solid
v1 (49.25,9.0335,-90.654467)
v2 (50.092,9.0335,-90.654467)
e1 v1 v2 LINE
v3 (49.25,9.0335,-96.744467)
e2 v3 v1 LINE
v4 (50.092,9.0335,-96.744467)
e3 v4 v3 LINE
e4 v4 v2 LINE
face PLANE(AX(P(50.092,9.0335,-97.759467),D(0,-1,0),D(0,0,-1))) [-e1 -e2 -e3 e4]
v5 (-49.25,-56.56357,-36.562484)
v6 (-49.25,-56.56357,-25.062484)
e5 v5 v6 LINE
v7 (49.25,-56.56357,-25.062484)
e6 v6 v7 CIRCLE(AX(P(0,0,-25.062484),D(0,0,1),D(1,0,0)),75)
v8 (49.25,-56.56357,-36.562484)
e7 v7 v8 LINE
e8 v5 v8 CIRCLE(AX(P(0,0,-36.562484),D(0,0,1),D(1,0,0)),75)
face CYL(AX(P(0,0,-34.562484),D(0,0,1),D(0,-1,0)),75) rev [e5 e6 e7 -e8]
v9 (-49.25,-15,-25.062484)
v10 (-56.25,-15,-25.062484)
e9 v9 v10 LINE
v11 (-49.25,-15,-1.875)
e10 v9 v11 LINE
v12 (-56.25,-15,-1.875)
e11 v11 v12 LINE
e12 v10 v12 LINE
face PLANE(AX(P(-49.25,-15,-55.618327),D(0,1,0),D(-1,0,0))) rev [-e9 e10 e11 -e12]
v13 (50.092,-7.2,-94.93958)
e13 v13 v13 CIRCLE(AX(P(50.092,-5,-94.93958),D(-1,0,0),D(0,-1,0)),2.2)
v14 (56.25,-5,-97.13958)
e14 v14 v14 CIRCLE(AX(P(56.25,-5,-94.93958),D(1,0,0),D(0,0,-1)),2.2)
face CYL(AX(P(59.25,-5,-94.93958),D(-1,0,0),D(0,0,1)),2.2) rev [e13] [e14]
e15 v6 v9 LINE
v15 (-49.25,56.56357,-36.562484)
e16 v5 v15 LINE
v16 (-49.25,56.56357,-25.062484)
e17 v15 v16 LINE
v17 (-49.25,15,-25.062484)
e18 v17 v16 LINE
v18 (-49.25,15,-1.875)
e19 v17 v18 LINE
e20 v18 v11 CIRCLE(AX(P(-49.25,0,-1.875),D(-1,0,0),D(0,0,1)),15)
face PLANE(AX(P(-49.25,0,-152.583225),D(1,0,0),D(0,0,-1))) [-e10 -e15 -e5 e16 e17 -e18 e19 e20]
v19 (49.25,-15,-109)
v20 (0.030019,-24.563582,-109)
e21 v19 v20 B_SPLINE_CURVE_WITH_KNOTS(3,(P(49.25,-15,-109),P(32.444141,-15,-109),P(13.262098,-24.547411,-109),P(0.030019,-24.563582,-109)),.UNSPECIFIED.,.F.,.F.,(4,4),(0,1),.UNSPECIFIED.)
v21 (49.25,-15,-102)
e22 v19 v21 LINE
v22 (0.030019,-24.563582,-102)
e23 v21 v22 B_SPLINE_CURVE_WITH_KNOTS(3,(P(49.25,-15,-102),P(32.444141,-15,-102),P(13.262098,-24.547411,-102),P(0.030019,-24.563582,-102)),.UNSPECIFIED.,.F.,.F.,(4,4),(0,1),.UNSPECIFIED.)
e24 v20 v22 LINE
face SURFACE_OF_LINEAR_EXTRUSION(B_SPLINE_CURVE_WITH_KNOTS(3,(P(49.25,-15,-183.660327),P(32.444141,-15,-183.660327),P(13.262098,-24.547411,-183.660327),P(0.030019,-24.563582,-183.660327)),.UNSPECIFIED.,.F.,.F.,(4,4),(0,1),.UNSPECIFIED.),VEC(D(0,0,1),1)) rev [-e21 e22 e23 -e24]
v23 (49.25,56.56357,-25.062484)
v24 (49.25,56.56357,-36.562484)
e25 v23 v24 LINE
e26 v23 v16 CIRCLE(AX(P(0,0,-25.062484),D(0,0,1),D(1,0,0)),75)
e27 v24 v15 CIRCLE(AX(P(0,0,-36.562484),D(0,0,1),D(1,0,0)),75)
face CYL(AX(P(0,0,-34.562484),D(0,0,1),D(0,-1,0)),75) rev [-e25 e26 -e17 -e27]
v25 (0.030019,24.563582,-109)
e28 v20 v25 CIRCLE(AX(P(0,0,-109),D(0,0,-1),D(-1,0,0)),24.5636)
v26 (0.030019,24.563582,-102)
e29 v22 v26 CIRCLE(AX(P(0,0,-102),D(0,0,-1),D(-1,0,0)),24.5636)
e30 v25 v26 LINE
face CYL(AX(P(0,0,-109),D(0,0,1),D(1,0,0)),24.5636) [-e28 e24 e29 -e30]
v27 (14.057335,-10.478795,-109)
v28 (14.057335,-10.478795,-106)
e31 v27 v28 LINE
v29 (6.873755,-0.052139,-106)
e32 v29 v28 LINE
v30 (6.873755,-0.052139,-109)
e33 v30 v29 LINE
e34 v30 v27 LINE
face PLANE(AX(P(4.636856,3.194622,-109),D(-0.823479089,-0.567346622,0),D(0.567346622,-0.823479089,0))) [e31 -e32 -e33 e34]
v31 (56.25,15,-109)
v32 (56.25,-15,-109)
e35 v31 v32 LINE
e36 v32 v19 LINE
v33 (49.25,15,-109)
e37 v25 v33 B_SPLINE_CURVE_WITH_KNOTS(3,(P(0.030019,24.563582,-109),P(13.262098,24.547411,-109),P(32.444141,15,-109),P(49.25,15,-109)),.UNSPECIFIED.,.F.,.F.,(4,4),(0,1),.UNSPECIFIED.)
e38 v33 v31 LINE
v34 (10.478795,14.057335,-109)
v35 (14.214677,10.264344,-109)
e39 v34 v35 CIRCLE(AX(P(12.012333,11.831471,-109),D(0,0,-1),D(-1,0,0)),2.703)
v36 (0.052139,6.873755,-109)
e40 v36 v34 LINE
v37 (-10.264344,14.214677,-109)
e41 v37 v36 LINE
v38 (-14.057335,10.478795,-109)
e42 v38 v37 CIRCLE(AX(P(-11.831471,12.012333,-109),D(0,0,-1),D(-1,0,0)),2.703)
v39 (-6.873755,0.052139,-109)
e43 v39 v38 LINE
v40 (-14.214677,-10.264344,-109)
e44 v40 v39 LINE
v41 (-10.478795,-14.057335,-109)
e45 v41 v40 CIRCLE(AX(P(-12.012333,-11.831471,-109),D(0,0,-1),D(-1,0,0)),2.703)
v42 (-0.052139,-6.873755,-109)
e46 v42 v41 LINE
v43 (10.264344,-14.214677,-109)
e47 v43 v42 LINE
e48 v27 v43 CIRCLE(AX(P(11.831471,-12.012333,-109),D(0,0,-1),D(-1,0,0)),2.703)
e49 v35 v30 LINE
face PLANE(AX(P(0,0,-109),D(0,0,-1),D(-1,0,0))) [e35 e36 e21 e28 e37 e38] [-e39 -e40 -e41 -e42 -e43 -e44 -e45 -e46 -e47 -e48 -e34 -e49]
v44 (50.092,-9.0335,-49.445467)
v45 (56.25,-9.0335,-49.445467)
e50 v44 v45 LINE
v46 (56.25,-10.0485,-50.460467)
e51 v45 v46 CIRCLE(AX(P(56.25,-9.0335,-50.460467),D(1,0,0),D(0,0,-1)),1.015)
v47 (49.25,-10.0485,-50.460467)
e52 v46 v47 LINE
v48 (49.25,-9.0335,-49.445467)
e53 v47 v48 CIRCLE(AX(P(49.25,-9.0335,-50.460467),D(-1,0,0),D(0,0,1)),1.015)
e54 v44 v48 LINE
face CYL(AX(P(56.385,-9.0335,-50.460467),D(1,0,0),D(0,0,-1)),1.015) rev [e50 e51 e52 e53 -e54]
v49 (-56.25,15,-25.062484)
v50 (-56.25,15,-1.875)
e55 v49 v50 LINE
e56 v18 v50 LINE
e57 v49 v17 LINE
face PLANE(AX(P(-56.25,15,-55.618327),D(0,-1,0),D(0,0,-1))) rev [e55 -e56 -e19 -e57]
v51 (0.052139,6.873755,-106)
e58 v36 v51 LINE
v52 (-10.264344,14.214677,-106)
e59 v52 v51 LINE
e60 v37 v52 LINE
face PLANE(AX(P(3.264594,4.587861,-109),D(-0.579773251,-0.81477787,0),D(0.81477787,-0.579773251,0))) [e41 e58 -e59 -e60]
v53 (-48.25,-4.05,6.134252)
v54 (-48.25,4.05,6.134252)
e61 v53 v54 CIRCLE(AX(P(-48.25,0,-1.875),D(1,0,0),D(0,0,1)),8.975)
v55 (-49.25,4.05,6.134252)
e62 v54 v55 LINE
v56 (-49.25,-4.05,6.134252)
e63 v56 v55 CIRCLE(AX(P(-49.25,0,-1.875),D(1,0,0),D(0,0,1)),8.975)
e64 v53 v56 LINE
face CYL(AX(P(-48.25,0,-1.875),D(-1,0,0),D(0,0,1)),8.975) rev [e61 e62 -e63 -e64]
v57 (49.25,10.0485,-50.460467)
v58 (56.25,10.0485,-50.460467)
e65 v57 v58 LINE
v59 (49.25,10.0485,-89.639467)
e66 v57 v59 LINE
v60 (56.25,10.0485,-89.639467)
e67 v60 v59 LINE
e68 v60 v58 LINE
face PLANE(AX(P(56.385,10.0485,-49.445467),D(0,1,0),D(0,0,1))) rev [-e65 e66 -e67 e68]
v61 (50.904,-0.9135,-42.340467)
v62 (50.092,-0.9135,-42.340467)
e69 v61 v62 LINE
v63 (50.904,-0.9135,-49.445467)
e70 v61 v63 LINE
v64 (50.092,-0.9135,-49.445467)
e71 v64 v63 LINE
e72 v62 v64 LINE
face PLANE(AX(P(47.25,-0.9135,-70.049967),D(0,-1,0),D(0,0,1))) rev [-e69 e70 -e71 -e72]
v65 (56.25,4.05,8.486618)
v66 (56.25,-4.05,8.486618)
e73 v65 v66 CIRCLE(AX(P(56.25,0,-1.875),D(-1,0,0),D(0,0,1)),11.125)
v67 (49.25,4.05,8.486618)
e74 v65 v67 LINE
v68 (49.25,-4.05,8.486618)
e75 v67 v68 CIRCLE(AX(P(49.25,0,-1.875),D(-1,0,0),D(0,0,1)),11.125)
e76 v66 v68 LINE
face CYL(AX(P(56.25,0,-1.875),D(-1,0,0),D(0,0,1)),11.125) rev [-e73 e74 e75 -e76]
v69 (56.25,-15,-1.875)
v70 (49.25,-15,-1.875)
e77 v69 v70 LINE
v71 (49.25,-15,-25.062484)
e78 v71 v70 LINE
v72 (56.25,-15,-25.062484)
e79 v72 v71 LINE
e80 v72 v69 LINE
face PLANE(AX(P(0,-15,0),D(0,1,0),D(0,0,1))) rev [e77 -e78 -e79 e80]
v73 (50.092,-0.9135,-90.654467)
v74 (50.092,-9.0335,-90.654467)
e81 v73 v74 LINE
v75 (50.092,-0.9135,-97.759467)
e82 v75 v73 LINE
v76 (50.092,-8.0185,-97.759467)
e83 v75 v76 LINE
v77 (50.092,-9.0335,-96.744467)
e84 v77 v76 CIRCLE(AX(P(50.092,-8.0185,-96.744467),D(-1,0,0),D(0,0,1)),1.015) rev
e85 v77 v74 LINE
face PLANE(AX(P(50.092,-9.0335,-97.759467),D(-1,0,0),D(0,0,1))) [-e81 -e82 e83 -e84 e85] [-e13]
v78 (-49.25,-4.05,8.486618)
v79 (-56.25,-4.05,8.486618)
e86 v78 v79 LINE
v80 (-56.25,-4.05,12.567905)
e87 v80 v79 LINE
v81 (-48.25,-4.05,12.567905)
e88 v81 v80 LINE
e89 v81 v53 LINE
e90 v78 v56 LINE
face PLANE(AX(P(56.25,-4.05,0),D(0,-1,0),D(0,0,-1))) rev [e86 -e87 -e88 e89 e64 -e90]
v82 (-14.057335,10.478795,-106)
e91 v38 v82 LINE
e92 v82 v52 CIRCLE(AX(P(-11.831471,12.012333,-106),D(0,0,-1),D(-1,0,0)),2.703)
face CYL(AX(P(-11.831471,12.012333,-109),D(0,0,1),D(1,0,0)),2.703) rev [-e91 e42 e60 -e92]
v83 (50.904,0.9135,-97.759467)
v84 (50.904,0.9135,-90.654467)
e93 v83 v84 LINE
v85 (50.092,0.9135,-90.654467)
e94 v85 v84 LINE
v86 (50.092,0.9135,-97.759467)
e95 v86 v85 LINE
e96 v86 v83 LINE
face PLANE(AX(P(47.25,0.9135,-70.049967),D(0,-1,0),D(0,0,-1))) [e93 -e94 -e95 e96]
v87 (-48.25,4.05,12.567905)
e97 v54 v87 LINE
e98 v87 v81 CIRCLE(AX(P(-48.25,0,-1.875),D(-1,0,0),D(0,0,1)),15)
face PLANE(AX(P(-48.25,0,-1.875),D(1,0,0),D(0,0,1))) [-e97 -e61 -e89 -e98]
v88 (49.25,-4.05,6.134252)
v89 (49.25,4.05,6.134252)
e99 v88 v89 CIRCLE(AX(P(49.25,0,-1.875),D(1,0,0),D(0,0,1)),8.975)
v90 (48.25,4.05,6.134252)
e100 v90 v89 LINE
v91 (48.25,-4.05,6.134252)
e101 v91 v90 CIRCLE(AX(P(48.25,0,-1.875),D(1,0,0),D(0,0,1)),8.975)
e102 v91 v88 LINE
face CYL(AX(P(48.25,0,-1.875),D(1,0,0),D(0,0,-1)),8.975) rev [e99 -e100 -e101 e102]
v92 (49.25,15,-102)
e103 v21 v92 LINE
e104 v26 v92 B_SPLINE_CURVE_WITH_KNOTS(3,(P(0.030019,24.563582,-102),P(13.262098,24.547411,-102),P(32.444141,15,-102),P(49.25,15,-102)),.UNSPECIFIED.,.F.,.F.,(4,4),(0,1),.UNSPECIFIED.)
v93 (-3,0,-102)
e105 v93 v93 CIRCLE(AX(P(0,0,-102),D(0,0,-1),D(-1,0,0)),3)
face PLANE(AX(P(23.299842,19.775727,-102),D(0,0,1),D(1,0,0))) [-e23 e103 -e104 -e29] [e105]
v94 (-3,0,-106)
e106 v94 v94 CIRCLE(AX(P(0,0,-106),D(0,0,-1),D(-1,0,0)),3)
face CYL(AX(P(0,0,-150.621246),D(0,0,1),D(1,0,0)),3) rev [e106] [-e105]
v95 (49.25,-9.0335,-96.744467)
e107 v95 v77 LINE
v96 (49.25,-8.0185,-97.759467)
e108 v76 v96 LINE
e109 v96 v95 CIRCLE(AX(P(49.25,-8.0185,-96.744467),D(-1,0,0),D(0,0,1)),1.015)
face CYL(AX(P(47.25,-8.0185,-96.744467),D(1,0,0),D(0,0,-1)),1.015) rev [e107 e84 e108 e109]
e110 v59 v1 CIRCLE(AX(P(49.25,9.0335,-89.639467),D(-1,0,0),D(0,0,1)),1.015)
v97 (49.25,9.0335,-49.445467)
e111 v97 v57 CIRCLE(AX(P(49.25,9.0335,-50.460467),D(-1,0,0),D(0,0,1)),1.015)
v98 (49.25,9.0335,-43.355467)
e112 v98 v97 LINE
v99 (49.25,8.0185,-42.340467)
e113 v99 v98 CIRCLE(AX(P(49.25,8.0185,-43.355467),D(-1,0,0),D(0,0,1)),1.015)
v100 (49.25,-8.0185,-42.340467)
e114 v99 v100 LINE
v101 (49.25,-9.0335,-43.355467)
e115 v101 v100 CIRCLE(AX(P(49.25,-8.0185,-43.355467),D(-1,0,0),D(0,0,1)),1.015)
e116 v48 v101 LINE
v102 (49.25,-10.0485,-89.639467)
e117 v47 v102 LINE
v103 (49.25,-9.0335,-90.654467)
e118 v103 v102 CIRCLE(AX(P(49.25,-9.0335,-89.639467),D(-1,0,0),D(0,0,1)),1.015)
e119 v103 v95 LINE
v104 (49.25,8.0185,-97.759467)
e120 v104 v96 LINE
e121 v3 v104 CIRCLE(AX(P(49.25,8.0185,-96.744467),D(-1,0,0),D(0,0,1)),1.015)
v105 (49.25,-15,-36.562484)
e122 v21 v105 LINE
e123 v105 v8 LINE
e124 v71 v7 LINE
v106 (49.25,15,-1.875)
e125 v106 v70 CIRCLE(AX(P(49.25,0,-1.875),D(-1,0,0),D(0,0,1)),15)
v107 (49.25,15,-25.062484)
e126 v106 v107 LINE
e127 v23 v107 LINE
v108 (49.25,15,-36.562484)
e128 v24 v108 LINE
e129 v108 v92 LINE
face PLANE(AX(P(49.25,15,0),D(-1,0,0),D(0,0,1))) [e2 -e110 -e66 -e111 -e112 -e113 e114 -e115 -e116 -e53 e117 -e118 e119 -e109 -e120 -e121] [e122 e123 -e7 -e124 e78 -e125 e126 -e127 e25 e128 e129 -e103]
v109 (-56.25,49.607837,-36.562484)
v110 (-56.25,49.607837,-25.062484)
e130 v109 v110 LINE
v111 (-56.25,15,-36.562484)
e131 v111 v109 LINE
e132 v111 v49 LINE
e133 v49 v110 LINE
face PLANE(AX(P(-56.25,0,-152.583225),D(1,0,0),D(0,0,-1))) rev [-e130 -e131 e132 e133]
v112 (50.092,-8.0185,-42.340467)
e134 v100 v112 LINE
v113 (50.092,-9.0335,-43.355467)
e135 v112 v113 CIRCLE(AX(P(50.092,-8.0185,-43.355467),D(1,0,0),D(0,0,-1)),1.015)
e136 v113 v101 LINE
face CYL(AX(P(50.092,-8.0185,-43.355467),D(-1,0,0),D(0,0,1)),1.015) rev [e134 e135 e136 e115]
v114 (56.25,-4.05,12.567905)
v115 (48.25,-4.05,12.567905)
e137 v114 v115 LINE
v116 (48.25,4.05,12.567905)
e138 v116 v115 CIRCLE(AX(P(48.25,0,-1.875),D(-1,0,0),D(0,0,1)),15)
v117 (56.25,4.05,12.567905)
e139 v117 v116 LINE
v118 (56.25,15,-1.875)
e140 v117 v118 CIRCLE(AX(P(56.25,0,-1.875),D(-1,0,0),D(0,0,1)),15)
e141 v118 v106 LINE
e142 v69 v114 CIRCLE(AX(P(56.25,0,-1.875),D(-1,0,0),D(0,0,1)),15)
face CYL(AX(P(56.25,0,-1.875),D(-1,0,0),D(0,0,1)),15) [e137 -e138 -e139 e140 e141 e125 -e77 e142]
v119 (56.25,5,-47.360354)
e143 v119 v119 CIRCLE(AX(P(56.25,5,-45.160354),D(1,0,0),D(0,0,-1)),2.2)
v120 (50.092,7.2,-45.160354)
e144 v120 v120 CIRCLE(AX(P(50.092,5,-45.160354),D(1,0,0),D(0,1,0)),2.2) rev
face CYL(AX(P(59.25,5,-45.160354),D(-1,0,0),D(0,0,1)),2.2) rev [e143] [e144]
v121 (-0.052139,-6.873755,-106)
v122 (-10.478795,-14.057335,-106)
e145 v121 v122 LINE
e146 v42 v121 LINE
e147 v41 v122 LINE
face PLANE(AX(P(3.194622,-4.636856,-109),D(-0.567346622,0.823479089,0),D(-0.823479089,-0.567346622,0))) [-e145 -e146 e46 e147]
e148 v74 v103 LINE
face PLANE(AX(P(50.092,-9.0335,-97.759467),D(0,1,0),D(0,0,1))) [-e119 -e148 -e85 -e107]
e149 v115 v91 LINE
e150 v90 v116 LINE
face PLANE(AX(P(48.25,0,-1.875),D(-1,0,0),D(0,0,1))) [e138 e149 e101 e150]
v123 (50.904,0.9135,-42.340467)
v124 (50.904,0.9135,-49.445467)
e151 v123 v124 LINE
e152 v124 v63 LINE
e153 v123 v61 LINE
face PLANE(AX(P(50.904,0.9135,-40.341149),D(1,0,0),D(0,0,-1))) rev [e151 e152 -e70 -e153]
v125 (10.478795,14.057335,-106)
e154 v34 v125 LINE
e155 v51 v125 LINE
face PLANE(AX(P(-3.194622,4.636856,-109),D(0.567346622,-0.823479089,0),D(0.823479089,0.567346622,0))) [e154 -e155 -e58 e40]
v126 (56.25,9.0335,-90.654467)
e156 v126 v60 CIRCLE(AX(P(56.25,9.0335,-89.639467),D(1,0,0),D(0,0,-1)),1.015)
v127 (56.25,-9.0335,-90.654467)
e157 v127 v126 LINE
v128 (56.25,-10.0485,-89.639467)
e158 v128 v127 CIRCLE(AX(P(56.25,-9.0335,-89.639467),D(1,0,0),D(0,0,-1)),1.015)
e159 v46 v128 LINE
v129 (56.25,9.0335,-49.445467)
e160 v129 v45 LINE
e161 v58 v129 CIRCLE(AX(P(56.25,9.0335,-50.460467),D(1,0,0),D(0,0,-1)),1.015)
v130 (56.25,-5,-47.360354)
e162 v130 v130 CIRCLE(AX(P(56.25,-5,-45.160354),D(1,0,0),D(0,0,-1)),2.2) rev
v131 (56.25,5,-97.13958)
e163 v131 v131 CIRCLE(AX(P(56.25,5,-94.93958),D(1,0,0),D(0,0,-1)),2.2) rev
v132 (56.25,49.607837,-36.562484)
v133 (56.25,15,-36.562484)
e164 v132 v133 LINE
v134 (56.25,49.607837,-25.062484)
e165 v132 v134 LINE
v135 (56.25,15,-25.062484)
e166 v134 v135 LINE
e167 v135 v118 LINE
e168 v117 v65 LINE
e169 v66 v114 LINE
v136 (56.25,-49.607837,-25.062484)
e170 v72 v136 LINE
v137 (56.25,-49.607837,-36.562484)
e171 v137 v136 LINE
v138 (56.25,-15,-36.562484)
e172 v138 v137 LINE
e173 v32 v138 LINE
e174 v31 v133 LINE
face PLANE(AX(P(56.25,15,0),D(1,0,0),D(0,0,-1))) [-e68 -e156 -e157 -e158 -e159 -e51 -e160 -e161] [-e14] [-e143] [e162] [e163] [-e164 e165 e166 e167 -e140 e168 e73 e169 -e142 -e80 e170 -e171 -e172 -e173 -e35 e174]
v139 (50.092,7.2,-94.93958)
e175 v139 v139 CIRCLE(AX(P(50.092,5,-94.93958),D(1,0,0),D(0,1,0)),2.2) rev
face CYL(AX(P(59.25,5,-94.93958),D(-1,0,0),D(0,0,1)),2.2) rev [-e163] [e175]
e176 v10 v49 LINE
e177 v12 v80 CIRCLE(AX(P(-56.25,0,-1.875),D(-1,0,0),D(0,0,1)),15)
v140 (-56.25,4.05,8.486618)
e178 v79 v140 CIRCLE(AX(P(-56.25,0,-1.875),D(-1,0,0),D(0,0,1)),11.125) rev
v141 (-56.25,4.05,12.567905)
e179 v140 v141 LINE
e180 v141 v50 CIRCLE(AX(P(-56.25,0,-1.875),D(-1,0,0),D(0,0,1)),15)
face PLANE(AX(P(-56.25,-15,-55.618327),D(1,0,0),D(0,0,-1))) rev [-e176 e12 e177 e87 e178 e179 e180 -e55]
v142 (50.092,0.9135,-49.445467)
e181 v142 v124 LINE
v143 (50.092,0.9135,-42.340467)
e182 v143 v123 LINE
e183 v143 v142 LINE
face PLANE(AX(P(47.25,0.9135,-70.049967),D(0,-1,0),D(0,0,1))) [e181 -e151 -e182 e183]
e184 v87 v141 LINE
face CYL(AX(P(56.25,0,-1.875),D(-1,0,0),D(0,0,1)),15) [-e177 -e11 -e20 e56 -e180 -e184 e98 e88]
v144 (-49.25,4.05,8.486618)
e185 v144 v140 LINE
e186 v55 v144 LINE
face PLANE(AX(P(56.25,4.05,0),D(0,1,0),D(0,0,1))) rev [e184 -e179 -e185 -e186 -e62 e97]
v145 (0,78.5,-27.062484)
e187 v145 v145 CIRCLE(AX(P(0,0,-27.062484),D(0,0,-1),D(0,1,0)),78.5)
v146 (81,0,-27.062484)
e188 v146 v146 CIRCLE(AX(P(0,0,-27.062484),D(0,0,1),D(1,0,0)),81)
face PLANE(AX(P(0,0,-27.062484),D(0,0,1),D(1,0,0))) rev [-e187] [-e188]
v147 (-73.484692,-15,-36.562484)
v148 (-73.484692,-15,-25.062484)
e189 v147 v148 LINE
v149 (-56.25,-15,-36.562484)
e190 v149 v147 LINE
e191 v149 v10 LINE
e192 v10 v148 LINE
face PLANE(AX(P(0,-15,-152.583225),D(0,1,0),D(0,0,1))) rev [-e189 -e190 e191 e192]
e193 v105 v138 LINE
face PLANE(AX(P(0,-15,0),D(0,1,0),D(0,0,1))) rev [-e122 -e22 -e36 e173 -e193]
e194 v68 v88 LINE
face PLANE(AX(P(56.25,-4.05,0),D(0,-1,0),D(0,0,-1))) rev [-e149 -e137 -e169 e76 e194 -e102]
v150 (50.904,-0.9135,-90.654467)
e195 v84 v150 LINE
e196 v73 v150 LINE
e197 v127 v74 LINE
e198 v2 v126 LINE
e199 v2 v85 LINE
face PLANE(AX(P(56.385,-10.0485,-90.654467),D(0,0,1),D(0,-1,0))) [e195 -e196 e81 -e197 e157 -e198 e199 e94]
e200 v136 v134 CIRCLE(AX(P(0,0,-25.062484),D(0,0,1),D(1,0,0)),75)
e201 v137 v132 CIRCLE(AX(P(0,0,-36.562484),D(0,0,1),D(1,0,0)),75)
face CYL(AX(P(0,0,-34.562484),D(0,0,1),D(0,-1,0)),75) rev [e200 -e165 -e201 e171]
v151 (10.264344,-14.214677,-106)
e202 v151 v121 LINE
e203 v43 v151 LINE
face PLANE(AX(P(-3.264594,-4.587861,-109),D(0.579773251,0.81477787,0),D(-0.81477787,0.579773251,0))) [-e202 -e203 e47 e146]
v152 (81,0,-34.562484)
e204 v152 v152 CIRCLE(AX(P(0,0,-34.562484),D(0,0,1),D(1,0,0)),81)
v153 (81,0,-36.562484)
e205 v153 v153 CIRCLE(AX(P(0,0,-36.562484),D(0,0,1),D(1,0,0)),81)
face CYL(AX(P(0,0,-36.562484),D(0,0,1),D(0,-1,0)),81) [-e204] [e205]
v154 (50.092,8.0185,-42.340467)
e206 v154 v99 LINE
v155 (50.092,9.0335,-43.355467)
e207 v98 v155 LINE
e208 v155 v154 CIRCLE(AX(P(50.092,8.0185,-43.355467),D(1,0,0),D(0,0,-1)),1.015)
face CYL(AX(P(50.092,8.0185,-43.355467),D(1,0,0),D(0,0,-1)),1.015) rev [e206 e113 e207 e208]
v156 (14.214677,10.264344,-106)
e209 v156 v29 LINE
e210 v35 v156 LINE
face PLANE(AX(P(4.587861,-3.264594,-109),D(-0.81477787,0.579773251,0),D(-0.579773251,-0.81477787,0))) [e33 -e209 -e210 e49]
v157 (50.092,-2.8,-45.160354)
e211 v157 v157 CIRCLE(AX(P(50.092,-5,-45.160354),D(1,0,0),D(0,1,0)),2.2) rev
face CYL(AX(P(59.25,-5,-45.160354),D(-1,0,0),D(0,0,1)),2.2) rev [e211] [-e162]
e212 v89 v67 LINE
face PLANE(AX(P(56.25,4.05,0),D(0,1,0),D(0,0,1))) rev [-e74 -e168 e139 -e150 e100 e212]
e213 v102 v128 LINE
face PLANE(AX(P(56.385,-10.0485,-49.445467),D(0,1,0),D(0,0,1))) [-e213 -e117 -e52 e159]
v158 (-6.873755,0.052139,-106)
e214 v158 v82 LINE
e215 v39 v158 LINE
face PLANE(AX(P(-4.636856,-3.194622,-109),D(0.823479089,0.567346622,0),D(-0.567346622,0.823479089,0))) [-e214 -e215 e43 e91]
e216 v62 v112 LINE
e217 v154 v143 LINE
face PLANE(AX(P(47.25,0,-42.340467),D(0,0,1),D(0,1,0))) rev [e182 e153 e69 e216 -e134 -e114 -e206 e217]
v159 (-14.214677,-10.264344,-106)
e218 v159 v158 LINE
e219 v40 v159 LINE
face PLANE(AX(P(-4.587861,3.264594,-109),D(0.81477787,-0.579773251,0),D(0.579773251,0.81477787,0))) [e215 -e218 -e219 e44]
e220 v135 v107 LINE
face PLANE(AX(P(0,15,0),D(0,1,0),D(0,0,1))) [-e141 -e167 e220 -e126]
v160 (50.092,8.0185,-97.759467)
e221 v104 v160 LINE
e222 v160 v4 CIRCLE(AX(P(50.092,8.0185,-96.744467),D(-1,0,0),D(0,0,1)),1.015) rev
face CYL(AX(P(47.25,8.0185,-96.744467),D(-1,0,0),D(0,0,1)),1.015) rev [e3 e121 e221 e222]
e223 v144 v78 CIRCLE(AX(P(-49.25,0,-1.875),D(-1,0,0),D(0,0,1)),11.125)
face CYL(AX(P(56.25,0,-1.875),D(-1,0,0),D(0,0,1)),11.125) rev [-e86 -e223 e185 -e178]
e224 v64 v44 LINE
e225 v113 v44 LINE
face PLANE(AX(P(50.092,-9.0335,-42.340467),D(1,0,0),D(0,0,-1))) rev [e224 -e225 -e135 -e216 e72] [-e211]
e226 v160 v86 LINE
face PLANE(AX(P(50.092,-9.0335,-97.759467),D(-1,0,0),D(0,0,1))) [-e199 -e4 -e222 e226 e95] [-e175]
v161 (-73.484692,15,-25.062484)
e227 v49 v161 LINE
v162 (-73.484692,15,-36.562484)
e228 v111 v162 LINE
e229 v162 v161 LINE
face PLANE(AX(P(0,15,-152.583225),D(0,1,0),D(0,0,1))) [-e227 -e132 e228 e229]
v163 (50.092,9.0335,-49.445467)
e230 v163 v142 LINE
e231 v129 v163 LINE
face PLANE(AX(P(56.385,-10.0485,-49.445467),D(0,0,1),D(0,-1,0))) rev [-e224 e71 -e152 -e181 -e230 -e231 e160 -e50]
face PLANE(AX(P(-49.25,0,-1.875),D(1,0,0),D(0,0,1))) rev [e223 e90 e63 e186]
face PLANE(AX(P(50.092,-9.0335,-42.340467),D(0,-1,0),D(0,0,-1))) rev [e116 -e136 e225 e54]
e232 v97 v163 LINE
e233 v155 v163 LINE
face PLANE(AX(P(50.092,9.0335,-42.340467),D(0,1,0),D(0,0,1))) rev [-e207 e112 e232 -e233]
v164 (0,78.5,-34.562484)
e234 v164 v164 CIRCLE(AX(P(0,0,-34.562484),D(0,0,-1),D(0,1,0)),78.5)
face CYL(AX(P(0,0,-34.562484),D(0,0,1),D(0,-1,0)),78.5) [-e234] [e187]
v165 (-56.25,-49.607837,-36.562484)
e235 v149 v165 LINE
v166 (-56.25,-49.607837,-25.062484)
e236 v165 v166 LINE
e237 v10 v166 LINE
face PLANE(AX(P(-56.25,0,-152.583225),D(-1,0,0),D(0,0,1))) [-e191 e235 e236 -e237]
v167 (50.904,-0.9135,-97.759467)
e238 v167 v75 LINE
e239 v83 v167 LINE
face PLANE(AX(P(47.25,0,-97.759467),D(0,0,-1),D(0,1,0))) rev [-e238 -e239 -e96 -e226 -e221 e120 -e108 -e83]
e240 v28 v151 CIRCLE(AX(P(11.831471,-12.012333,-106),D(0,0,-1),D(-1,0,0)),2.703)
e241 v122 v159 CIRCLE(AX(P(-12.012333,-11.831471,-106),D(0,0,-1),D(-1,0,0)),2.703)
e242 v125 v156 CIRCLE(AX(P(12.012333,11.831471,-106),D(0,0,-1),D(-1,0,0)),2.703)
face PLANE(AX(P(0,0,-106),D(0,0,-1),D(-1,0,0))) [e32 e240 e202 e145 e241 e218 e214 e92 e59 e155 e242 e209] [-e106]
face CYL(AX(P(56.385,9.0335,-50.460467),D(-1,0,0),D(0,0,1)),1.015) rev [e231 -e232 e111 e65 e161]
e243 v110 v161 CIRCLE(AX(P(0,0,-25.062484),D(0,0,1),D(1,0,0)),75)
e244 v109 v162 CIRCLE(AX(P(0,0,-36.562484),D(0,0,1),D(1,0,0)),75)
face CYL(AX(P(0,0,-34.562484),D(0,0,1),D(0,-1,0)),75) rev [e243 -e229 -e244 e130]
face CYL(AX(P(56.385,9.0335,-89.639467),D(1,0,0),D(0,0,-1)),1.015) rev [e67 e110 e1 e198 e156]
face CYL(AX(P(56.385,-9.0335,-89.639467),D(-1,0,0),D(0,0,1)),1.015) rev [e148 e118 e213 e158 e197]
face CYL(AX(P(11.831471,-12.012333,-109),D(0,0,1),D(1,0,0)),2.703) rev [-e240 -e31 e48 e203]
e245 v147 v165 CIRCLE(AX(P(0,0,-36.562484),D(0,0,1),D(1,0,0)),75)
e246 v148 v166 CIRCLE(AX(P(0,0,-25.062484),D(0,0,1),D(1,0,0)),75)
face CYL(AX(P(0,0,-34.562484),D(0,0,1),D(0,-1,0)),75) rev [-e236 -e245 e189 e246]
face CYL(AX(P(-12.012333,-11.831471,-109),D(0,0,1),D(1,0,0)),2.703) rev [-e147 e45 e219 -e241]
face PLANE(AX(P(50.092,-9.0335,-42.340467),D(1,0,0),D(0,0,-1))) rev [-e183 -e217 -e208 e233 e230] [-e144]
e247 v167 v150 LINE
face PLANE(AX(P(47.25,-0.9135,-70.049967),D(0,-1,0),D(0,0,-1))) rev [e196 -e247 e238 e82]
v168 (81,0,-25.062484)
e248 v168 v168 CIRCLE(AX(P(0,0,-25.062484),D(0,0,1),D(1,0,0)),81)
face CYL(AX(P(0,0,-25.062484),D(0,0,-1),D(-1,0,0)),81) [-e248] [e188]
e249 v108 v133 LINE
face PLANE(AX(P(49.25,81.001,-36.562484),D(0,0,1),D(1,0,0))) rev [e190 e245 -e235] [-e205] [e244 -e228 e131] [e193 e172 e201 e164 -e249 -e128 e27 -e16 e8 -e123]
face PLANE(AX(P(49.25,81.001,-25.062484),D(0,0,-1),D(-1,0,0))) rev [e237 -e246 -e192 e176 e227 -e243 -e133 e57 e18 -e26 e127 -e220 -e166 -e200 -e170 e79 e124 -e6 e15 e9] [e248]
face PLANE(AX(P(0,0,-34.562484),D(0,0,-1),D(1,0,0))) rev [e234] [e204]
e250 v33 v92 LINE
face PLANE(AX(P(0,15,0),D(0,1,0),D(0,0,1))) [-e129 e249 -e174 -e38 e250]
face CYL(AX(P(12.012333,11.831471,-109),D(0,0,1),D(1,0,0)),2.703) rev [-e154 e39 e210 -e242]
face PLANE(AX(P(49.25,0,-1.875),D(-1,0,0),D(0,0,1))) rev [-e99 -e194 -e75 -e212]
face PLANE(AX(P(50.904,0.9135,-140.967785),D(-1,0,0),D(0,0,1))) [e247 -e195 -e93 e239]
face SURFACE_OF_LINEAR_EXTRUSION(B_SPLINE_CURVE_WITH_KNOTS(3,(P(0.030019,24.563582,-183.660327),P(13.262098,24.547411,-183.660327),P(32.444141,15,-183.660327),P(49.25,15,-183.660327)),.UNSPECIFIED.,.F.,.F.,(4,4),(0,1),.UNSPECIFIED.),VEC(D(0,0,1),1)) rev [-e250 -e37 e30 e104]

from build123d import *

# Parameters (mm, degrees)
SKETCH1_W                             = 7
SKETCH1_H                             = 2
SKETCH1_H_2                           = 22.25
BOSS_EXTRUDE1_DEPTH                   = 15
CUT_EXTRUDE1_DEPTH                    = 129.379320765
CUT_EXTRUDE1_DEPTH_BACK               = 129.379320765
SKETCH3_R                             = 11.125
CUT_EXTRUDE2_DEPTH                    = 7
SKETCH6_W                             = 34
SKETCH6_H                             = 20.3
CUT_EXTRUDE3_DEPTH                    = 7
SKETCH7_R                             = 2.2
CUT_EXTRUDE4_DEPTH                    = 10
CAVITY3_START                         = 49.25
CAVITY3_DEPTH                         = 0.842
CAVITY3_2_DEPTH                       = 6.6275
CAVITY3_START_2                       = 55.8775
CAVITY3_3_DEPTH                       = 0.3725
CAVITY3_START_3                       = -0.9135
CAVITY3_4_DEPTH                       = 1.827
CUT_EXTRUDE5_DEPTH                    = 10
CUT_EXTRUDE6_DEPTH                    = 0.842
CUT_EXTRUDE7_START                    = -7.105
SKETCH10_W                            = 0.812
SKETCH10_H                            = 1.827
CUT_EXTRUDE7_DEPTH                    = 7.105
SKETCH11_W                            = 7
SKETCH11_H                            = 30
BOSS_EXTRUDE2_DEPTH                   = 42
CAVITY4_START                         = 49.25
CAVITY4_DEPTH                         = 7
CAVITY4_2_DEPTH                       = 6.6275
CAVITY4_3_DEPTH                       = 0.842
CAVITY4_START_2                       = -0.9135
CAVITY4_4_DEPTH                       = 1.827
CUT_EXTRUDE8_DEPTH                    = 42
MIRROR3_COPY_1_SKETCH_R               = 2.2
MIRROR3_COPY_1_DEPTH                  = 10
MIRROR3_COPY_2_SKETCH_R               = 2.2
MIRROR3_COPY_2_DEPTH                  = 10
MIRROR3_COPY_3_DEPTH                  = 0.842
CUT_EXTRUDE9_DEPTH                    = 42
BOSS_EXTRUDE3_DEPTH                   = 30
BOSS_EXTRUDE6_DEPTH                   = 1
SKETCH21_R                            = 58.215655111
SKETCH21_R_2                          = 51.483613898
BOSS_EXTRUDE8_DEPTH                   = 6
CUT_EXTRUDE10_START                   = -11.527984
SKETCH21_2_R                          = 51.483613898
CUT_EXTRUDE10_DEPTH                   = 17.527984
CUT_EXTRUDE11_DEPTH                   = 139.396512432
SKETCH23_W                            = 7
SKETCH23_H                            = 30
BOSS_EXTRUDE9_DEPTH                   = 6.062483515
CUT_EXTRUDE12_DEPTH                   = 12
BOSS_EXTRUDE10_DEPTH                  = 12
BOSS_EXTRUDE12_DEPTH                  = 5.527984
SKETCH28_R                            = 78.5
SKETCH28_R_2                          = 75
BOSS_EXTRUDE13_DEPTH                  = 3.75
SKETCH29_R                            = 81
SKETCH29_R_2                          = 75
BOSS_EXTRUDE14_DEPTH                  = 2
SKETCH30_W                            = 7
SKETCH30_H                            = 30
CUT_EXTRUDE13_DEPTH                   = 11.75
SKETCH31_W                            = 7
SKETCH31_H                            = 30
BOSS_EXTRUDE15_DEPTH                  = 11.5
BOSS_EXTRUDE16_REACH                  = 163.805
BOSS_EXTRUDE16_END_RADIUS             = 75
SKETCH33_W                            = 7
SKETCH33_H                            = 11.5
BOSS_EXTRUDE16_DIRECTION_2_REACH      = 163.805
BOSS_EXTRUDE16_DIRECTION_2_END_RADIUS = 75
SKETCH34_R                            = 24.5636
BOSS_EXTRUDE17_DEPTH                  = 7
SKETCH34_3_R                          = 3
BOSS_EXTRUDE18_DEPTH                  = 4
BOSS_EXTRUDE19_DEPTH                  = 7


with BuildPart() as part:
    # Sketch1 → Boss-Extrude1 (new, symmetric)
    with BuildSketch(Plane(origin=(0, 0, 0), x_dir=(1, 0, 0), z_dir=(0, 1, 0))):
        with Locations((-52.75, -12.125)):
            Rectangle(SKETCH1_W, SKETCH1_H)
        with Locations((-52.75, 0)):
            Rectangle(SKETCH1_W, SKETCH1_H_2)
        Polygon((-49.25, 11.125), (-49.25, 53), (49.25, 53), (49.25, 11.125), (56.25, 11.125), (56.25, 60), (-56.25, 60), (-56.25, 11.125), align=None)
        with Locations((52.75, 0)):
            Rectangle(SKETCH1_W, SKETCH1_H_2)
        with Locations((52.75, -12.125)):
            Rectangle(SKETCH1_W, SKETCH1_H)
    extrude(amount=BOSS_EXTRUDE1_DEPTH, both=True)

    # Sketch2 → Cut-Extrude1 (cut, two sides: drawn at the far end of the back side and taken through both)
    with BuildSketch(Plane.ZY.offset(56.25).offset(-CUT_EXTRUDE1_DEPTH_BACK)):
        with BuildLine():
            Line((13.125, 15), (-1.875, 15))
            ThreePointArc((-1.875, 15), (7.18728448, 11.953033088), (12.567904832, 4.05))
            Line((12.567904832, 4.05), (8.486617876, 4.05))
            ThreePointArc((8.486617876, 4.05), (-13, 0), (8.486617876, -4.05))
            Line((8.486617876, -4.05), (12.567904832, -4.05))
            ThreePointArc((12.567904832, -4.05), (7.18728448, -11.953033088), (-1.875, -15))
            Line((-1.875, -15), (13.125, -15))
            Line((13.125, -15), (13.125, 15))
        make_face()
    extrude(amount=CUT_EXTRUDE1_DEPTH + CUT_EXTRUDE1_DEPTH_BACK, mode=Mode.SUBTRACT)

    # Sketch3 → Cut-Extrude2 (cut)
    with BuildSketch(Plane(origin=(0, 0, -60), x_dir=(-1, 0, 0), z_dir=(0, 0, -1))):
        Circle(SKETCH3_R)
    extrude(amount=-CUT_EXTRUDE2_DEPTH, mode=Mode.SUBTRACT)

    # Sketch6 → Cut-Extrude3 (cut)
    with BuildSketch(Plane(origin=(0, 0, -60), x_dir=(-1, 0, 0), z_dir=(0, 0, -1))):
        with Locations((-32.25, 0)):
            Rectangle(SKETCH6_W, SKETCH6_H)
    extrude(amount=-CUT_EXTRUDE3_DEPTH, mode=Mode.SUBTRACT)

    # Sketch7 → Cut-Extrude4 (cut)
    with BuildSketch(Plane.ZY.offset(-49.25)):
        with Locations((-45.160353728, 5)):
            Circle(SKETCH7_R)
    cut_extrude4 = extrude(amount=-CUT_EXTRUDE4_DEPTH, mode=Mode.SUBTRACT)

    # Cavity3: read off the stored shape, not the designer's step
    # Cavity3 outline → Cavity3 (cut)
    with BuildSketch(Plane.YZ.offset(CAVITY3_START)):
        with BuildLine():
            Line((-3.80625, -42.340467029), (-3.80625, -42.949467029))
            ThreePointArc((-3.80625, -42.949467029), (-5.075, -47.020009529), (-6.34375, -42.949467029))
            Line((-6.34375, -42.949467029), (-6.34375, -42.340467029))
            Line((-6.34375, -42.340467029), (-8.0185, -42.340467029))
            ThreePointArc((-8.0185, -42.340467029), (-8.736213383, -42.637753646), (-9.0335, -43.355467029))
            Line((-9.0335, -43.355467029), (-9.0335, -49.445467029))
            Line((-9.0335, -49.445467029), (9.0335, -49.445467029))
            Line((9.0335, -49.445467029), (9.0335, -43.355467029))
            ThreePointArc((9.0335, -43.355467029), (8.736213383, -42.637753646), (8.0185, -42.340467029))
            Line((8.0185, -42.340467029), (6.34375, -42.340467029))
            Line((6.34375, -42.340467029), (6.34375, -42.949467029))
            ThreePointArc((6.34375, -42.949467029), (7.209542976, -44.131254024), (7.156577631, -45.595293863))
            ThreePointArc((7.156577631, -45.595293863), (4.566705044, -47.317262507), (2.842761328, -44.728704204))
            ThreePointArc((2.842761328, -44.728704204), (3.111418667, -43.723695206), (3.80625, -42.949467029))
            Line((3.80625, -42.949467029), (3.80625, -42.340467029))
            Line((3.80625, -42.340467029), (-3.80625, -42.340467029))
        make_face()
    extrude(amount=CAVITY3_DEPTH, mode=Mode.SUBTRACT)

    # Cavity3 2 outline → Cavity3 2 (cut)
    with BuildSketch(Plane.YZ.offset(CAVITY3_START)):
        with BuildLine():
            ThreePointArc((10.0485, -50.460467029), (9.751213383, -49.742753646), (9.0335, -49.445467029))
            Line((9.0335, -49.445467029), (-9.0335, -49.445467029))
            ThreePointArc((-9.0335, -49.445467029), (-9.751213383, -49.742753646), (-10.0485, -50.460467029))
            Line((-10.0485, -50.460467029), (-10.0485, -60))
            Line((-10.0485, -60), (10.0485, -60))
            Line((10.0485, -60), (10.0485, -50.460467029))
        make_face()
    extrude(amount=CAVITY3_2_DEPTH, mode=Mode.SUBTRACT)

    # Cavity3 3 outline → Cavity3 3 (cut)
    with BuildSketch(Plane.YZ.offset(CAVITY3_START_2)):
        with BuildLine():
            Line((-9.744, -60), (9.744, -60))
            Line((9.744, -60), (9.744, -50.511217029))
            ThreePointArc((9.744, -50.511217029), (9.521035037, -49.972931992), (8.98275, -49.749967029))
            Line((8.98275, -49.749967029), (-8.98275, -49.749967029))
            ThreePointArc((-8.98275, -49.749967029), (-9.521035037, -49.972931992), (-9.744, -50.511217029))
            Line((-9.744, -50.511217029), (-9.744, -60))
        make_face()
    extrude(amount=CAVITY3_3_DEPTH, mode=Mode.SUBTRACT)

    # Cavity3 4 outline → Cavity3 4 (cut)
    with BuildSketch(Plane(origin=(0, 0, 0), x_dir=(1, 0, 0), z_dir=(0, 1, 0)).offset(CAVITY3_START_3)):
        Polygon((50.092, 49.445467029), (50.092, 42.340467029), (50.904, 49.445467029), align=None)
    extrude(amount=CAVITY3_4_DEPTH, mode=Mode.SUBTRACT)

    # Mirror1: Cut-Extrude4 across plane
    add(cut_extrude4.mirror(Plane.ZX), mode=Mode.SUBTRACT)

    # Sketch8 → Cut-Extrude5 (cut)
    with BuildSketch(Plane.ZY.offset(-55.8775)):
        with BuildLine():
            Line((-60, -10.0485), (-50.460467029, -10.0485))
            ThreePointArc((-50.460467029, -10.0485), (-49.742753646, -9.751213383), (-49.445467029, -9.0335))
            Line((-49.445467029, -9.0335), (-49.445467029, 9.0335))
            ThreePointArc((-49.445467029, 9.0335), (-49.742753646, 9.751213383), (-50.460467029, 10.0485))
            Line((-50.460467029, 10.0485), (-60, 10.0485))
            Line((-60, 10.0485), (-60, 9.744))
            Line((-60, 9.744), (-50.511217029, 9.744))
            ThreePointArc((-50.511217029, 9.744), (-49.972931992, 9.521035037), (-49.749967029, 8.98275))
            Line((-49.749967029, 8.98275), (-49.749967029, -8.98275))
            ThreePointArc((-49.749967029, -8.98275), (-49.972931992, -9.521035037), (-50.511217029, -9.744))
            Line((-50.511217029, -9.744), (-60, -9.744))
            Line((-60, -9.744), (-60, -10.0485))
        make_face()
    cut_extrude5 = extrude(amount=-CUT_EXTRUDE5_DEPTH, mode=Mode.SUBTRACT)

    # Sketch9 → Cut-Extrude6 (cut)
    with BuildSketch(Plane.ZY.offset(-49.25)):
        with BuildLine():
            Line((-42.340467029, 6.34375), (-42.340467029, 3.80625))
            Line((-42.340467029, 3.80625), (-42.949467029, 3.80625))
            ThreePointArc((-42.949467029, 3.80625), (-43.723695206, 3.111418667), (-44.728704204, 2.842761328))
            ThreePointArc((-44.728704204, 2.842761328), (-43.003444949, 5.433294956), (-45.595293863, 7.156577631))
            ThreePointArc((-45.595293863, 7.156577631), (-44.131254024, 7.209542976), (-42.949467029, 6.34375))
            Line((-42.949467029, 6.34375), (-42.340467029, 6.34375))
        make_face()
    cut_extrude6 = extrude(amount=-CUT_EXTRUDE6_DEPTH, mode=Mode.SUBTRACT)

    # Mirror2: Cut-Extrude6 across plane
    add(cut_extrude6.mirror(Plane.ZX), mode=Mode.SUBTRACT)

    # Sketch10 → Cut-Extrude7 (cut)
    with BuildSketch(Plane(origin=(0, 0, -49.445467029), x_dir=(-1, 0, 0), z_dir=(0, 0, -1)).offset(CUT_EXTRUDE7_START)):
        with Locations((-50.498, 0)):
            Rectangle(SKETCH10_W, SKETCH10_H)
    cut_extrude7 = extrude(amount=CUT_EXTRUDE7_DEPTH, mode=Mode.SUBTRACT)

    # Sketch11 → Boss-Extrude2 (add)
    with BuildSketch(Plane(origin=(0, 0, -60), x_dir=(-1, 0, 0), z_dir=(0, 0, -1))):
        with Locations((-52.75, 0)):
            Rectangle(SKETCH11_W, SKETCH11_H)
    extrude(amount=BOSS_EXTRUDE2_DEPTH)

    # Cavity4: read off the stored shape, not the designer's step
    # Cavity4 outline → Cavity4 (cut)
    with BuildSketch(Plane.YZ.offset(CAVITY4_START)):
        with BuildLine():
            Line((9.744, -60), (-9.744, -60))
            Line((-9.744, -60), (-9.744, -89.588717029))
            ThreePointArc((-9.744, -89.588717029), (-9.521035037, -90.127002066), (-8.98275, -90.349967029))
            Line((-8.98275, -90.349967029), (8.98275, -90.349967029))
            ThreePointArc((8.98275, -90.349967029), (9.521035037, -90.127002066), (9.744, -89.588717029))
            Line((9.744, -89.588717029), (9.744, -60))
        make_face()
    extrude(amount=CAVITY4_DEPTH, mode=Mode.SUBTRACT)

    # Cavity4 2 outline → Cavity4 2 (cut)
    with BuildSketch(Plane.YZ.offset(CAVITY4_START)):
        with BuildLine():
            Line((-9.0335, -90.654467029), (9.0335, -90.654467029))
            ThreePointArc((9.0335, -90.654467029), (9.751213383, -90.357180412), (10.0485, -89.639467029))
            Line((10.0485, -89.639467029), (10.0485, -60))
            Line((10.0485, -60), (9.744, -60))
            Line((9.744, -60), (9.744, -89.588717029))
            ThreePointArc((9.744, -89.588717029), (9.521035037, -90.127002066), (8.98275, -90.349967029))
            Line((8.98275, -90.349967029), (-8.98275, -90.349967029))
            ThreePointArc((-8.98275, -90.349967029), (-9.521035037, -90.127002066), (-9.744, -89.588717029))
            Line((-9.744, -89.588717029), (-9.744, -60))
            Line((-9.744, -60), (-10.0485, -60))
            Line((-10.0485, -60), (-10.0485, -89.639467029))
            ThreePointArc((-10.0485, -89.639467029), (-9.751213383, -90.357180412), (-9.0335, -90.654467029))
        make_face()
    extrude(amount=CAVITY4_2_DEPTH, mode=Mode.SUBTRACT)

    # Cavity4 3 outline → Cavity4 3 (cut)
    with BuildSketch(Plane.YZ.offset(CAVITY4_START)):
        with BuildLine():
            Line((-9.0335, -90.654467029), (-9.0335, -96.744467029))
            ThreePointArc((-9.0335, -96.744467029), (-8.736213383, -97.462180412), (-8.0185, -97.759467029))
            Line((-8.0185, -97.759467029), (-6.34375, -97.759467029))
            Line((-6.34375, -97.759467029), (-6.34375, -97.150467029))
            ThreePointArc((-6.34375, -97.150467029), (-5.075, -93.07992453), (-3.80625, -97.150467029))
            Line((-3.80625, -97.150467029), (-3.80625, -97.759467029))
            Line((-3.80625, -97.759467029), (3.80625, -97.759467029))
            Line((3.80625, -97.759467029), (3.80625, -97.150467029))
            ThreePointArc((3.80625, -97.150467029), (5.075, -93.07992453), (6.34375, -97.150467029))
            Line((6.34375, -97.150467029), (6.34375, -97.759467029))
            Line((6.34375, -97.759467029), (8.0185, -97.759467029))
            ThreePointArc((8.0185, -97.759467029), (8.736213383, -97.462180412), (9.0335, -96.744467029))
            Line((9.0335, -96.744467029), (9.0335, -90.654467029))
            Line((9.0335, -90.654467029), (-9.0335, -90.654467029))
        make_face()
    extrude(amount=CAVITY4_3_DEPTH, mode=Mode.SUBTRACT)

    # Cavity4 4 outline → Cavity4 4 (cut)
    with BuildSketch(Plane(origin=(0, 0, 0), x_dir=(1, 0, 0), z_dir=(0, 1, 0)).offset(CAVITY4_START_2)):
        Polygon((50.904, 90.654467029), (50.092, 97.759467029), (50.092, 90.654467029), align=None)
    extrude(amount=CAVITY4_4_DEPTH, mode=Mode.SUBTRACT)

    # Sketch12 → Cut-Extrude8 (cut)
    with BuildSketch(Plane.ZY.offset(-55.8775)):
        with BuildLine():
            Line((-60, 10.0485), (-89.639467029, 10.0485))
            ThreePointArc((-89.639467029, 10.0485), (-90.357180412, 9.751213383), (-90.654467029, 9.0335))
            Line((-90.654467029, 9.0335), (-90.654467029, -9.0335))
            ThreePointArc((-90.654467029, -9.0335), (-90.357180412, -9.751213383), (-89.639467029, -10.0485))
            Line((-89.639467029, -10.0485), (-60, -10.0485))
            Line((-60, -10.0485), (-60, -9.744))
            Line((-60, -9.744), (-89.588717029, -9.744))
            ThreePointArc((-89.588717029, -9.744), (-90.127002066, -9.521035037), (-90.349967029, -8.98275))
            Line((-90.349967029, -8.98275), (-90.349967029, 8.98275))
            ThreePointArc((-90.349967029, 8.98275), (-90.127002066, 9.521035037), (-89.588717029, 9.744))
            Line((-89.588717029, 9.744), (-60, 9.744))
            Line((-60, 9.744), (-60, 10.0485))
        make_face()
    extrude(amount=-CUT_EXTRUDE8_DEPTH, mode=Mode.SUBTRACT)

    # Mirror3: Cut-Extrude5, Cut-Extrude6, Cut-Extrude7 across plane
    add(cut_extrude5.mirror(Plane(origin=(0, 0, -70.049967029), x_dir=(1, 0, 0), z_dir=(0, 0, -1))), mode=Mode.SUBTRACT)
    add(cut_extrude6.mirror(Plane(origin=(0, 0, -70.049967029), x_dir=(1, 0, 0), z_dir=(0, 0, -1))), mode=Mode.SUBTRACT)
    add(cut_extrude7.mirror(Plane(origin=(0, 0, -70.049967029), x_dir=(1, 0, 0), z_dir=(0, 0, -1))), mode=Mode.SUBTRACT)

    # Mirror3 copy 1 sketch → Mirror3 copy 1 (cut)
    with BuildSketch(Plane(origin=(49.25, 0, -140.099934058), x_dir=(0, 0, -1), z_dir=(-1, 0, 0))):
        with Locations((-45.160353728, 5)):
            Circle(MIRROR3_COPY_1_SKETCH_R)
    extrude(amount=-MIRROR3_COPY_1_DEPTH, mode=Mode.SUBTRACT)

    # Mirror3 copy 2 sketch → Mirror3 copy 2 (cut)
    with BuildSketch(Plane(origin=(49.25, 0, -140.099934058), x_dir=(0, 0, -1), z_dir=(-1, 0, 0))):
        with Locations((-45.160353728, -5)):
            Circle(MIRROR3_COPY_2_SKETCH_R)
    extrude(amount=-MIRROR3_COPY_2_DEPTH, mode=Mode.SUBTRACT)

    # Mirror3 copy 3 sketch → Mirror3 copy 3 (cut)
    with BuildSketch(Plane(origin=(49.25, 0, -140.099934058), x_dir=(0, 0, -1), z_dir=(-1, 0, 0))):
        with BuildLine():
            Line((-42.340467029, 6.34375), (-42.340467029, 3.80625))
            Line((-42.340467029, 3.80625), (-42.949467029, 3.80625))
            ThreePointArc((-42.949467029, 3.80625), (-43.723695206, 3.111418667), (-44.728704204, 2.842761328))
            ThreePointArc((-44.728704204, 2.842761328), (-43.003444949, 5.433294956), (-45.595293863, 7.156577631))
            ThreePointArc((-45.595293863, 7.156577631), (-44.131254024, 7.209542976), (-42.949467029, 6.34375))
            Line((-42.949467029, 6.34375), (-42.340467029, 6.34375))
        make_face()
    extrude(amount=-MIRROR3_COPY_3_DEPTH, mode=Mode.SUBTRACT)

    # Sketch13 → Cut-Extrude9 (cut)
    with BuildSketch(Plane(origin=(0, 15, 0), x_dir=(1, 0, 0), z_dir=(0, 1, 0))):
        Polygon((-56.25, 60), (-56.25, 18.75), (-15, 60), align=None)
    extrude(amount=-CUT_EXTRUDE9_DEPTH, mode=Mode.SUBTRACT)


with BuildPart() as cut_extrude9_piece_1:
    # of the separate pieces the step leaves, piece 1, a body of its own (cut_extrude9_pieces)
    add(part.part.solids().sort_by_distance((49.25, -15, -60))[0])



with BuildPart() as cut_extrude9_piece_2:
    # of the separate pieces the step leaves, piece 2, a body of its own (cut_extrude9_pieces)
    add(part.part.solids().sort_by_distance((-56.25, -15, -1.875))[0])


with BuildPart() as cut_extrude9_piece_1_1:
    add(cut_extrude9_piece_1.part)

    add(cut_extrude9_piece_2.part)  # Boss-Extrude3 merges Cut-Extrude9 piece 2
    # Sketch13<3> → Boss-Extrude3 (add)
    with BuildSketch(Plane(origin=(0, 15, 0), x_dir=(1, 0, 0), z_dir=(0, 1, 0))):
        Polygon((-49.25, 25.75), (-49.25, 18.75), (-15, 53), (-22, 53), align=None)
    extrude(amount=-BOSS_EXTRUDE3_DEPTH)

    # Sketch18 → Boss-Extrude6 (add)
    with BuildSketch(Plane.ZY.offset(-49.25)):
        with BuildLine():
            Line((8.486617876, 4.05), (6.134252462, 4.05))
            ThreePointArc((6.134252462, 4.05), (-10.85, 0), (6.134252462, -4.05))
            Line((6.134252462, -4.05), (8.486617876, -4.05))
            Line((8.486617876, -4.05), (12.567904832, -4.05))
            ThreePointArc((12.567904832, -4.05), (-16.875, 0), (12.567904832, 4.05))
            Line((12.567904832, 4.05), (8.486617876, 4.05))
        make_face()
    boss_extrude6 = extrude(amount=BOSS_EXTRUDE6_DEPTH)

    # Mirror4: Boss-Extrude6 across plane
    add(boss_extrude6.mirror(Plane(origin=(0, 0, 0), x_dir=(0, 0, 1), z_dir=(1, 0, 0))))

    # Sketch21 → Boss-Extrude8 (add, symmetric)
    with BuildSketch(Plane.XY.offset(-30.812483515)):
        with Locations(Location((0, 0, 0), (0, 0, 14.931417178))):
            Circle(SKETCH21_R)
        Circle(SKETCH21_R_2, mode=Mode.SUBTRACT)
    extrude(amount=BOSS_EXTRUDE8_DEPTH, both=True)

    # Sketch21<2> → Cut-Extrude10 (cut)
    with BuildSketch(Plane.XY.offset(-30.812483515).offset(CUT_EXTRUDE10_START)):
        with Locations(Location((0, 0, 0), (0, 0, 16.939085631))):
            Circle(SKETCH21_2_R)
    extrude(amount=CUT_EXTRUDE10_DEPTH, mode=Mode.SUBTRACT)

    # Sketch22 → Cut-Extrude11 (cut, through all)
    with BuildSketch(Plane(origin=(0, 15, 0), x_dir=(1, 0, 0), z_dir=(0, 1, 0))):
        Polygon((-15, 60), (-32.659532971, 42.340467029), (-25.659532971, 42.340467029), (-15, 53), (49.25, 53), (49.25, 60), align=None)
        Polygon((-49.25, 18.75), (-56.25, 18.75), (-50.187516485, 24.812483515), (-43.187516485, 24.812483515), align=None)
    extrude(amount=-CUT_EXTRUDE11_DEPTH, mode=Mode.SUBTRACT)


with BuildPart() as cut_extrude11_piece_1:
    # of the separate pieces the step leaves, piece 1, a body of its own (cut_extrude11_pieces)
    add(cut_extrude9_piece_1_1.part.solids().sort_by_distance((49.25, 15, -24.812483515))[0])



with BuildPart() as cut_extrude11_piece_2:
    # of the separate pieces the step leaves, piece 2, a body of its own (cut_extrude11_pieces)
    add(cut_extrude9_piece_1_1.part.solids().sort_by_distance((-56.25, -15, -1.875))[0])


with BuildPart() as cut_extrude11_piece_1_1:
    add(cut_extrude11_piece_1.part)

    add(cut_extrude11_piece_2.part)  # Boss-Extrude9 merges Cut-Extrude11 piece 2
    # Sketch23 → Boss-Extrude9 (add)
    with BuildSketch(Plane(origin=(0, 0, -18.75), x_dir=(-1, 0, 0), z_dir=(0, 0, -1))):
        with Locations((52.75, 0)):
            Rectangle(SKETCH23_W, SKETCH23_H)
    extrude(amount=BOSS_EXTRUDE9_DEPTH)

    # Sketch24 → Cut-Extrude12 (cut)
    with BuildSketch(Plane.XY.offset(-24.812483515)):
        with BuildLine():
            ThreePointArc((56.25, 15), (0, 58.215655111), (-56.25, 15))
            Line((-56.25, 15), (-49.25, 15))
            ThreePointArc((-49.25, 15), (0, 51.483613898), (49.25, 15))
            Line((49.25, 15), (56.25, 15))
        make_face()
        with BuildLine():
            Line((-56.25, -15), (-56.25, 15))
            ThreePointArc((-56.25, 15), (-58.215655111, 0), (-56.25, -15))
        make_face()
        with BuildLine():
            Line((-49.25, -15), (-56.25, -15))
            ThreePointArc((-56.25, -15), (0, -58.215655111), (56.25, -15))
            Line((56.25, -15), (49.25, -15))
            ThreePointArc((49.25, -15), (0, -51.483613898), (-49.25, -15))
        make_face()
        with BuildLine():
            ThreePointArc((56.25, -15), (58.215655111, 0), (56.25, 15))
            Line((56.25, 15), (56.25, -15))
        make_face()
    extrude(amount=-CUT_EXTRUDE12_DEPTH, mode=Mode.SUBTRACT)


with BuildPart() as cut_extrude12_piece_1:
    # of the separate pieces the step leaves, piece 1, a body of its own (cut_extrude12_pieces)
    add(cut_extrude11_piece_1_1.part.solids().sort_by_distance((56.25, -15, -102))[0])



with BuildPart() as cut_extrude12_piece_2:
    # of the separate pieces the step leaves, piece 2, a body of its own (cut_extrude12_pieces)
    add(cut_extrude11_piece_1_1.part.solids().sort_by_distance((-56.25, -15, -1.875))[0])


with BuildPart() as cut_extrude12_piece_1_1:
    add(cut_extrude12_piece_1.part)

    add(cut_extrude12_piece_2.part)  # Boss-Extrude10 merges Cut-Extrude12 piece 2
    # Sketch25 → Boss-Extrude10 (add)
    with BuildSketch(Plane(origin=(0, 0, -24.812483515), x_dir=(-1, 0, 0), z_dir=(0, 0, -1))):
        with BuildLine():
            Line((49.25, 15), (49.25, -15))
            ThreePointArc((49.25, -15), (51.483613898, 0), (49.25, 15))
        make_face()
        with BuildLine():
            Line((-49.25, -15), (-49.25, 15))
            ThreePointArc((-49.25, 15), (-51.483613898, 0), (-49.25, -15))
        make_face()
    extrude(amount=BOSS_EXTRUDE10_DEPTH)

    # Sketch26 → Boss-Extrude12 (add)
    with BuildSketch(Plane(origin=(0, 0, -36.812483515), x_dir=(-1, 0, 0), z_dir=(0, 0, -1))):
        with BuildLine():
            Line((-49.25, -15), (-49.25, 15))
            ThreePointArc((-49.25, 15), (-51.483613898, 0), (-49.25, -15))
        make_face()
    extrude(amount=BOSS_EXTRUDE12_DEPTH)

    # Sketch30 → Cut-Extrude13 (cut)
    with BuildSketch(Plane(origin=(0, 0, -36.812483515), x_dir=(-1, 0, 0), z_dir=(0, 0, -1))):
        with Locations((52.75, 0)):
            Rectangle(SKETCH30_W, SKETCH30_H)
    extrude(amount=-CUT_EXTRUDE13_DEPTH, mode=Mode.SUBTRACT)



with BuildPart() as body_2:
    # Sketch28 → Boss-Extrude13 (new, symmetric)
    with BuildSketch(Plane(origin=(0, 0, -30.812483515), x_dir=(1, 0, 0), z_dir=(0, 0, -1))):
        with Locations(Location((0, 0, 0), (0, 0, 270))):
            Circle(SKETCH28_R)
        with Locations(Location((0, 0, 0), (0, 0, 270))):
            Circle(SKETCH28_R_2, mode=Mode.SUBTRACT)
    extrude(amount=BOSS_EXTRUDE13_DEPTH, both=True)

    # Sketch29 → Boss-Extrude14 (add)
    with BuildSketch(Plane.XY.offset(-27.062483515)):
        Circle(SKETCH29_R)
        Circle(SKETCH29_R_2, mode=Mode.SUBTRACT)
    boss_extrude14 = extrude(amount=BOSS_EXTRUDE14_DEPTH)

    # Mirror5: Boss-Extrude14 across plane
    add(boss_extrude14.mirror(Plane(origin=(0, 0, -30.812483515), x_dir=(1, 0, 0), z_dir=(0, 0, -1))))


with BuildPart() as cut_extrude12_piece_1_2:
    add(cut_extrude12_piece_1_1.part)

    add(body_2.part)  # Boss-Extrude15 merges body 2
    # Sketch31 → Boss-Extrude15 (add)
    with BuildSketch(Plane(origin=(0, 0, -25.062483515), x_dir=(-1, 0, 0), z_dir=(0, 0, -1))):
        with BuildLine():
            Line((49.25, 15), (56.25, 15))
            Line((56.25, 15), (56.25, 49.607837082))
            ThreePointArc((56.25, 49.607837082), (52.864525503, 53.200958106), (49.25, 56.563570432))
            Line((49.25, 56.563570432), (49.25, 15))
        make_face()
        with Locations((52.75, 0)):
            Rectangle(SKETCH31_W, SKETCH31_H)
        with BuildLine():
            Line((56.25, -49.607837082), (56.25, -15))
            Line((56.25, -15), (49.25, -15))
            Line((49.25, -15), (49.25, -56.563570432))
            ThreePointArc((49.25, -56.563570432), (52.864525503, -53.200958106), (56.25, -49.607837082))
        make_face()
        with BuildLine():
            Line((73.484692283, 15), (56.25, 15))
            Line((56.25, 15), (56.25, -15))
            Line((56.25, -15), (73.484692283, -15))
            ThreePointArc((73.484692283, -15), (75, 0), (73.484692283, 15))
        make_face()
    extrude(amount=BOSS_EXTRUDE15_DEPTH)

    # Boss-Extrude16: up to this cylinder (the profile starts inside it)
    boss_extrude16_end = Plane(origin=(0, 0, -30.812484), z_dir=(0, 0, 1)) * Cylinder(BOSS_EXTRUDE16_END_RADIUS, 478.61, mode=Mode.PRIVATE)
    # Sketch33 → Boss-Extrude16 (add, up to the surface)
    with BuildSketch(Plane(origin=(0, 15, 0), x_dir=(1, 0, 0), z_dir=(0, 1, 0)), mode=Mode.PRIVATE) as boss_extrude16_sk1:
        with Locations((52.75, 30.812483515)):
            Rectangle(SKETCH33_W, SKETCH33_H)
    boss_extrude16_tool1 = extrude(boss_extrude16_sk1.sketch, amount=BOSS_EXTRUDE16_REACH, mode=Mode.PRIVATE) & boss_extrude16_end
    add(boss_extrude16_tool1.solids().sort_by_distance((52.75, 15, -30.812484))[0])

    # Boss-Extrude16 direction 2: up to this cylinder (the profile starts inside it)
    boss_extrude16_direction_2_end = Plane(origin=(0, 0, -30.812484), z_dir=(0, 0, 1)) * Cylinder(BOSS_EXTRUDE16_DIRECTION_2_END_RADIUS, 478.61, mode=Mode.PRIVATE)
    # Sketch33 → Boss-Extrude16 direction 2 (add, up to the surface)
    with BuildSketch(Plane(origin=(0, 15, 0), x_dir=(1, 0, 0), z_dir=(0, 1, 0)), mode=Mode.PRIVATE) as boss_extrude16_direction_2_sk1:
        with Locations((52.75, 30.812483515)):
            Rectangle(SKETCH33_W, SKETCH33_H)
    boss_extrude16_direction_2_tool1 = extrude(boss_extrude16_direction_2_sk1.sketch, amount=-BOSS_EXTRUDE16_DIRECTION_2_REACH, mode=Mode.PRIVATE) & boss_extrude16_direction_2_end
    add(boss_extrude16_direction_2_tool1.solids().sort_by_distance((52.75, 15, -30.812484))[0])



with BuildPart() as body_2_2:
    # Sketch34 → Boss-Extrude17 (new body)
    with BuildSketch(Plane(origin=(0, 0, -102), x_dir=(-1, 0, 0), z_dir=(0, 0, -1))):
        Circle(SKETCH34_R)
        with BuildLine():
            ThreePointArc((-14.057334707, -10.478794609), (-13.728227984, -13.938084566), (-10.264343631, -14.214677111))
            Line((-10.264343631, -14.214677111), (0.052139321, -6.873755028))
            Line((0.052139321, -6.873755028), (10.478794609, -14.057334707))
            ThreePointArc((10.478794609, -14.057334707), (13.938084566, -13.728227984), (14.214677111, -10.264343631))
            Line((14.214677111, -10.264343631), (6.873755028, 0.052139321))
            Line((6.873755028, 0.052139321), (14.057334707, 10.478794609))
            ThreePointArc((14.057334707, 10.478794609), (13.728227984, 13.938084566), (10.264343631, 14.214677111))
            Line((10.264343631, 14.214677111), (-0.052139321, 6.873755028))
            Line((-0.052139321, 6.873755028), (-10.478794609, 14.057334707))
            ThreePointArc((-10.478794609, 14.057334707), (-13.938084566, 13.728227984), (-14.214677111, 10.264343631))
            Line((-14.214677111, 10.264343631), (-6.873755028, -0.052139321))
            Line((-6.873755028, -0.052139321), (-14.057334707, -10.478794609))
        make_face(mode=Mode.SUBTRACT)
    extrude(amount=BOSS_EXTRUDE17_DEPTH)

    # Sketch34<3> → Boss-Extrude18 (add)
    with BuildSketch(Plane(origin=(0, 0, -102), x_dir=(-1, 0, 0), z_dir=(0, 0, -1))):
        with BuildLine():
            Line((-6.873755028, -0.052139321), (-14.057334707, -10.478794609))
            ThreePointArc((-14.057334707, -10.478794609), (-13.728227984, -13.938084566), (-10.264343631, -14.214677111))
            Line((-10.264343631, -14.214677111), (0.052139321, -6.873755028))
            Line((0.052139321, -6.873755028), (10.478794609, -14.057334707))
            ThreePointArc((10.478794609, -14.057334707), (13.938084566, -13.728227984), (14.214677111, -10.264343631))
            Line((14.214677111, -10.264343631), (6.873755028, 0.052139321))
            Line((6.873755028, 0.052139321), (14.057334707, 10.478794609))
            ThreePointArc((14.057334707, 10.478794609), (13.728227984, 13.938084566), (10.264343631, 14.214677111))
            Line((10.264343631, 14.214677111), (-0.052139321, 6.873755028))
            Line((-0.052139321, 6.873755028), (-10.478794609, 14.057334707))
            ThreePointArc((-10.478794609, 14.057334707), (-13.938084566, 13.728227984), (-14.214677111, 10.264343631))
            Line((-14.214677111, 10.264343631), (-6.873755028, -0.052139321))
        make_face()
        Circle(SKETCH34_3_R, mode=Mode.SUBTRACT)
    extrude(amount=BOSS_EXTRUDE18_DEPTH)


with BuildPart() as cut_extrude12_piece_1_3:
    add(cut_extrude12_piece_1_2.part)

    add(body_2_2.part)  # Boss-Extrude19 merges body 2 2
    # Sketch35 → Boss-Extrude19 (add)
    with BuildSketch(Plane(origin=(0, 0, -102), x_dir=(-1, 0, 0), z_dir=(0, 0, -1))):
        with BuildLine():
            Line((-49.25, 15), (-56.25, 15))
            Line((-56.25, 15), (-56.25, -15))
            Line((-56.25, -15), (-49.25, -15))
            add(Edge.make_bspline(
                [(-49.25, -15), (-32.444141428, -15), (-13.2620985, -24.547410977), (-0.0300187, -24.563581657)],
                knots=[0, 0, 0, 0, 1, 1, 1, 1], degree=3))
            ThreePointArc((-0.0300187, -24.563581657), (-24.5636, 0), (-0.0300187, 24.563581657))
            add(Edge.make_bspline(
                [(-49.25, 15), (-32.444141428, 15), (-13.2620985, 24.547410977), (-0.0300187, 24.563581657)],
                knots=[0, 0, 0, 0, 1, 1, 1, 1], degree=3))
        make_face()
    extrude(amount=BOSS_EXTRUDE19_DEPTH)


solid = cut_extrude12_piece_1_3.part
